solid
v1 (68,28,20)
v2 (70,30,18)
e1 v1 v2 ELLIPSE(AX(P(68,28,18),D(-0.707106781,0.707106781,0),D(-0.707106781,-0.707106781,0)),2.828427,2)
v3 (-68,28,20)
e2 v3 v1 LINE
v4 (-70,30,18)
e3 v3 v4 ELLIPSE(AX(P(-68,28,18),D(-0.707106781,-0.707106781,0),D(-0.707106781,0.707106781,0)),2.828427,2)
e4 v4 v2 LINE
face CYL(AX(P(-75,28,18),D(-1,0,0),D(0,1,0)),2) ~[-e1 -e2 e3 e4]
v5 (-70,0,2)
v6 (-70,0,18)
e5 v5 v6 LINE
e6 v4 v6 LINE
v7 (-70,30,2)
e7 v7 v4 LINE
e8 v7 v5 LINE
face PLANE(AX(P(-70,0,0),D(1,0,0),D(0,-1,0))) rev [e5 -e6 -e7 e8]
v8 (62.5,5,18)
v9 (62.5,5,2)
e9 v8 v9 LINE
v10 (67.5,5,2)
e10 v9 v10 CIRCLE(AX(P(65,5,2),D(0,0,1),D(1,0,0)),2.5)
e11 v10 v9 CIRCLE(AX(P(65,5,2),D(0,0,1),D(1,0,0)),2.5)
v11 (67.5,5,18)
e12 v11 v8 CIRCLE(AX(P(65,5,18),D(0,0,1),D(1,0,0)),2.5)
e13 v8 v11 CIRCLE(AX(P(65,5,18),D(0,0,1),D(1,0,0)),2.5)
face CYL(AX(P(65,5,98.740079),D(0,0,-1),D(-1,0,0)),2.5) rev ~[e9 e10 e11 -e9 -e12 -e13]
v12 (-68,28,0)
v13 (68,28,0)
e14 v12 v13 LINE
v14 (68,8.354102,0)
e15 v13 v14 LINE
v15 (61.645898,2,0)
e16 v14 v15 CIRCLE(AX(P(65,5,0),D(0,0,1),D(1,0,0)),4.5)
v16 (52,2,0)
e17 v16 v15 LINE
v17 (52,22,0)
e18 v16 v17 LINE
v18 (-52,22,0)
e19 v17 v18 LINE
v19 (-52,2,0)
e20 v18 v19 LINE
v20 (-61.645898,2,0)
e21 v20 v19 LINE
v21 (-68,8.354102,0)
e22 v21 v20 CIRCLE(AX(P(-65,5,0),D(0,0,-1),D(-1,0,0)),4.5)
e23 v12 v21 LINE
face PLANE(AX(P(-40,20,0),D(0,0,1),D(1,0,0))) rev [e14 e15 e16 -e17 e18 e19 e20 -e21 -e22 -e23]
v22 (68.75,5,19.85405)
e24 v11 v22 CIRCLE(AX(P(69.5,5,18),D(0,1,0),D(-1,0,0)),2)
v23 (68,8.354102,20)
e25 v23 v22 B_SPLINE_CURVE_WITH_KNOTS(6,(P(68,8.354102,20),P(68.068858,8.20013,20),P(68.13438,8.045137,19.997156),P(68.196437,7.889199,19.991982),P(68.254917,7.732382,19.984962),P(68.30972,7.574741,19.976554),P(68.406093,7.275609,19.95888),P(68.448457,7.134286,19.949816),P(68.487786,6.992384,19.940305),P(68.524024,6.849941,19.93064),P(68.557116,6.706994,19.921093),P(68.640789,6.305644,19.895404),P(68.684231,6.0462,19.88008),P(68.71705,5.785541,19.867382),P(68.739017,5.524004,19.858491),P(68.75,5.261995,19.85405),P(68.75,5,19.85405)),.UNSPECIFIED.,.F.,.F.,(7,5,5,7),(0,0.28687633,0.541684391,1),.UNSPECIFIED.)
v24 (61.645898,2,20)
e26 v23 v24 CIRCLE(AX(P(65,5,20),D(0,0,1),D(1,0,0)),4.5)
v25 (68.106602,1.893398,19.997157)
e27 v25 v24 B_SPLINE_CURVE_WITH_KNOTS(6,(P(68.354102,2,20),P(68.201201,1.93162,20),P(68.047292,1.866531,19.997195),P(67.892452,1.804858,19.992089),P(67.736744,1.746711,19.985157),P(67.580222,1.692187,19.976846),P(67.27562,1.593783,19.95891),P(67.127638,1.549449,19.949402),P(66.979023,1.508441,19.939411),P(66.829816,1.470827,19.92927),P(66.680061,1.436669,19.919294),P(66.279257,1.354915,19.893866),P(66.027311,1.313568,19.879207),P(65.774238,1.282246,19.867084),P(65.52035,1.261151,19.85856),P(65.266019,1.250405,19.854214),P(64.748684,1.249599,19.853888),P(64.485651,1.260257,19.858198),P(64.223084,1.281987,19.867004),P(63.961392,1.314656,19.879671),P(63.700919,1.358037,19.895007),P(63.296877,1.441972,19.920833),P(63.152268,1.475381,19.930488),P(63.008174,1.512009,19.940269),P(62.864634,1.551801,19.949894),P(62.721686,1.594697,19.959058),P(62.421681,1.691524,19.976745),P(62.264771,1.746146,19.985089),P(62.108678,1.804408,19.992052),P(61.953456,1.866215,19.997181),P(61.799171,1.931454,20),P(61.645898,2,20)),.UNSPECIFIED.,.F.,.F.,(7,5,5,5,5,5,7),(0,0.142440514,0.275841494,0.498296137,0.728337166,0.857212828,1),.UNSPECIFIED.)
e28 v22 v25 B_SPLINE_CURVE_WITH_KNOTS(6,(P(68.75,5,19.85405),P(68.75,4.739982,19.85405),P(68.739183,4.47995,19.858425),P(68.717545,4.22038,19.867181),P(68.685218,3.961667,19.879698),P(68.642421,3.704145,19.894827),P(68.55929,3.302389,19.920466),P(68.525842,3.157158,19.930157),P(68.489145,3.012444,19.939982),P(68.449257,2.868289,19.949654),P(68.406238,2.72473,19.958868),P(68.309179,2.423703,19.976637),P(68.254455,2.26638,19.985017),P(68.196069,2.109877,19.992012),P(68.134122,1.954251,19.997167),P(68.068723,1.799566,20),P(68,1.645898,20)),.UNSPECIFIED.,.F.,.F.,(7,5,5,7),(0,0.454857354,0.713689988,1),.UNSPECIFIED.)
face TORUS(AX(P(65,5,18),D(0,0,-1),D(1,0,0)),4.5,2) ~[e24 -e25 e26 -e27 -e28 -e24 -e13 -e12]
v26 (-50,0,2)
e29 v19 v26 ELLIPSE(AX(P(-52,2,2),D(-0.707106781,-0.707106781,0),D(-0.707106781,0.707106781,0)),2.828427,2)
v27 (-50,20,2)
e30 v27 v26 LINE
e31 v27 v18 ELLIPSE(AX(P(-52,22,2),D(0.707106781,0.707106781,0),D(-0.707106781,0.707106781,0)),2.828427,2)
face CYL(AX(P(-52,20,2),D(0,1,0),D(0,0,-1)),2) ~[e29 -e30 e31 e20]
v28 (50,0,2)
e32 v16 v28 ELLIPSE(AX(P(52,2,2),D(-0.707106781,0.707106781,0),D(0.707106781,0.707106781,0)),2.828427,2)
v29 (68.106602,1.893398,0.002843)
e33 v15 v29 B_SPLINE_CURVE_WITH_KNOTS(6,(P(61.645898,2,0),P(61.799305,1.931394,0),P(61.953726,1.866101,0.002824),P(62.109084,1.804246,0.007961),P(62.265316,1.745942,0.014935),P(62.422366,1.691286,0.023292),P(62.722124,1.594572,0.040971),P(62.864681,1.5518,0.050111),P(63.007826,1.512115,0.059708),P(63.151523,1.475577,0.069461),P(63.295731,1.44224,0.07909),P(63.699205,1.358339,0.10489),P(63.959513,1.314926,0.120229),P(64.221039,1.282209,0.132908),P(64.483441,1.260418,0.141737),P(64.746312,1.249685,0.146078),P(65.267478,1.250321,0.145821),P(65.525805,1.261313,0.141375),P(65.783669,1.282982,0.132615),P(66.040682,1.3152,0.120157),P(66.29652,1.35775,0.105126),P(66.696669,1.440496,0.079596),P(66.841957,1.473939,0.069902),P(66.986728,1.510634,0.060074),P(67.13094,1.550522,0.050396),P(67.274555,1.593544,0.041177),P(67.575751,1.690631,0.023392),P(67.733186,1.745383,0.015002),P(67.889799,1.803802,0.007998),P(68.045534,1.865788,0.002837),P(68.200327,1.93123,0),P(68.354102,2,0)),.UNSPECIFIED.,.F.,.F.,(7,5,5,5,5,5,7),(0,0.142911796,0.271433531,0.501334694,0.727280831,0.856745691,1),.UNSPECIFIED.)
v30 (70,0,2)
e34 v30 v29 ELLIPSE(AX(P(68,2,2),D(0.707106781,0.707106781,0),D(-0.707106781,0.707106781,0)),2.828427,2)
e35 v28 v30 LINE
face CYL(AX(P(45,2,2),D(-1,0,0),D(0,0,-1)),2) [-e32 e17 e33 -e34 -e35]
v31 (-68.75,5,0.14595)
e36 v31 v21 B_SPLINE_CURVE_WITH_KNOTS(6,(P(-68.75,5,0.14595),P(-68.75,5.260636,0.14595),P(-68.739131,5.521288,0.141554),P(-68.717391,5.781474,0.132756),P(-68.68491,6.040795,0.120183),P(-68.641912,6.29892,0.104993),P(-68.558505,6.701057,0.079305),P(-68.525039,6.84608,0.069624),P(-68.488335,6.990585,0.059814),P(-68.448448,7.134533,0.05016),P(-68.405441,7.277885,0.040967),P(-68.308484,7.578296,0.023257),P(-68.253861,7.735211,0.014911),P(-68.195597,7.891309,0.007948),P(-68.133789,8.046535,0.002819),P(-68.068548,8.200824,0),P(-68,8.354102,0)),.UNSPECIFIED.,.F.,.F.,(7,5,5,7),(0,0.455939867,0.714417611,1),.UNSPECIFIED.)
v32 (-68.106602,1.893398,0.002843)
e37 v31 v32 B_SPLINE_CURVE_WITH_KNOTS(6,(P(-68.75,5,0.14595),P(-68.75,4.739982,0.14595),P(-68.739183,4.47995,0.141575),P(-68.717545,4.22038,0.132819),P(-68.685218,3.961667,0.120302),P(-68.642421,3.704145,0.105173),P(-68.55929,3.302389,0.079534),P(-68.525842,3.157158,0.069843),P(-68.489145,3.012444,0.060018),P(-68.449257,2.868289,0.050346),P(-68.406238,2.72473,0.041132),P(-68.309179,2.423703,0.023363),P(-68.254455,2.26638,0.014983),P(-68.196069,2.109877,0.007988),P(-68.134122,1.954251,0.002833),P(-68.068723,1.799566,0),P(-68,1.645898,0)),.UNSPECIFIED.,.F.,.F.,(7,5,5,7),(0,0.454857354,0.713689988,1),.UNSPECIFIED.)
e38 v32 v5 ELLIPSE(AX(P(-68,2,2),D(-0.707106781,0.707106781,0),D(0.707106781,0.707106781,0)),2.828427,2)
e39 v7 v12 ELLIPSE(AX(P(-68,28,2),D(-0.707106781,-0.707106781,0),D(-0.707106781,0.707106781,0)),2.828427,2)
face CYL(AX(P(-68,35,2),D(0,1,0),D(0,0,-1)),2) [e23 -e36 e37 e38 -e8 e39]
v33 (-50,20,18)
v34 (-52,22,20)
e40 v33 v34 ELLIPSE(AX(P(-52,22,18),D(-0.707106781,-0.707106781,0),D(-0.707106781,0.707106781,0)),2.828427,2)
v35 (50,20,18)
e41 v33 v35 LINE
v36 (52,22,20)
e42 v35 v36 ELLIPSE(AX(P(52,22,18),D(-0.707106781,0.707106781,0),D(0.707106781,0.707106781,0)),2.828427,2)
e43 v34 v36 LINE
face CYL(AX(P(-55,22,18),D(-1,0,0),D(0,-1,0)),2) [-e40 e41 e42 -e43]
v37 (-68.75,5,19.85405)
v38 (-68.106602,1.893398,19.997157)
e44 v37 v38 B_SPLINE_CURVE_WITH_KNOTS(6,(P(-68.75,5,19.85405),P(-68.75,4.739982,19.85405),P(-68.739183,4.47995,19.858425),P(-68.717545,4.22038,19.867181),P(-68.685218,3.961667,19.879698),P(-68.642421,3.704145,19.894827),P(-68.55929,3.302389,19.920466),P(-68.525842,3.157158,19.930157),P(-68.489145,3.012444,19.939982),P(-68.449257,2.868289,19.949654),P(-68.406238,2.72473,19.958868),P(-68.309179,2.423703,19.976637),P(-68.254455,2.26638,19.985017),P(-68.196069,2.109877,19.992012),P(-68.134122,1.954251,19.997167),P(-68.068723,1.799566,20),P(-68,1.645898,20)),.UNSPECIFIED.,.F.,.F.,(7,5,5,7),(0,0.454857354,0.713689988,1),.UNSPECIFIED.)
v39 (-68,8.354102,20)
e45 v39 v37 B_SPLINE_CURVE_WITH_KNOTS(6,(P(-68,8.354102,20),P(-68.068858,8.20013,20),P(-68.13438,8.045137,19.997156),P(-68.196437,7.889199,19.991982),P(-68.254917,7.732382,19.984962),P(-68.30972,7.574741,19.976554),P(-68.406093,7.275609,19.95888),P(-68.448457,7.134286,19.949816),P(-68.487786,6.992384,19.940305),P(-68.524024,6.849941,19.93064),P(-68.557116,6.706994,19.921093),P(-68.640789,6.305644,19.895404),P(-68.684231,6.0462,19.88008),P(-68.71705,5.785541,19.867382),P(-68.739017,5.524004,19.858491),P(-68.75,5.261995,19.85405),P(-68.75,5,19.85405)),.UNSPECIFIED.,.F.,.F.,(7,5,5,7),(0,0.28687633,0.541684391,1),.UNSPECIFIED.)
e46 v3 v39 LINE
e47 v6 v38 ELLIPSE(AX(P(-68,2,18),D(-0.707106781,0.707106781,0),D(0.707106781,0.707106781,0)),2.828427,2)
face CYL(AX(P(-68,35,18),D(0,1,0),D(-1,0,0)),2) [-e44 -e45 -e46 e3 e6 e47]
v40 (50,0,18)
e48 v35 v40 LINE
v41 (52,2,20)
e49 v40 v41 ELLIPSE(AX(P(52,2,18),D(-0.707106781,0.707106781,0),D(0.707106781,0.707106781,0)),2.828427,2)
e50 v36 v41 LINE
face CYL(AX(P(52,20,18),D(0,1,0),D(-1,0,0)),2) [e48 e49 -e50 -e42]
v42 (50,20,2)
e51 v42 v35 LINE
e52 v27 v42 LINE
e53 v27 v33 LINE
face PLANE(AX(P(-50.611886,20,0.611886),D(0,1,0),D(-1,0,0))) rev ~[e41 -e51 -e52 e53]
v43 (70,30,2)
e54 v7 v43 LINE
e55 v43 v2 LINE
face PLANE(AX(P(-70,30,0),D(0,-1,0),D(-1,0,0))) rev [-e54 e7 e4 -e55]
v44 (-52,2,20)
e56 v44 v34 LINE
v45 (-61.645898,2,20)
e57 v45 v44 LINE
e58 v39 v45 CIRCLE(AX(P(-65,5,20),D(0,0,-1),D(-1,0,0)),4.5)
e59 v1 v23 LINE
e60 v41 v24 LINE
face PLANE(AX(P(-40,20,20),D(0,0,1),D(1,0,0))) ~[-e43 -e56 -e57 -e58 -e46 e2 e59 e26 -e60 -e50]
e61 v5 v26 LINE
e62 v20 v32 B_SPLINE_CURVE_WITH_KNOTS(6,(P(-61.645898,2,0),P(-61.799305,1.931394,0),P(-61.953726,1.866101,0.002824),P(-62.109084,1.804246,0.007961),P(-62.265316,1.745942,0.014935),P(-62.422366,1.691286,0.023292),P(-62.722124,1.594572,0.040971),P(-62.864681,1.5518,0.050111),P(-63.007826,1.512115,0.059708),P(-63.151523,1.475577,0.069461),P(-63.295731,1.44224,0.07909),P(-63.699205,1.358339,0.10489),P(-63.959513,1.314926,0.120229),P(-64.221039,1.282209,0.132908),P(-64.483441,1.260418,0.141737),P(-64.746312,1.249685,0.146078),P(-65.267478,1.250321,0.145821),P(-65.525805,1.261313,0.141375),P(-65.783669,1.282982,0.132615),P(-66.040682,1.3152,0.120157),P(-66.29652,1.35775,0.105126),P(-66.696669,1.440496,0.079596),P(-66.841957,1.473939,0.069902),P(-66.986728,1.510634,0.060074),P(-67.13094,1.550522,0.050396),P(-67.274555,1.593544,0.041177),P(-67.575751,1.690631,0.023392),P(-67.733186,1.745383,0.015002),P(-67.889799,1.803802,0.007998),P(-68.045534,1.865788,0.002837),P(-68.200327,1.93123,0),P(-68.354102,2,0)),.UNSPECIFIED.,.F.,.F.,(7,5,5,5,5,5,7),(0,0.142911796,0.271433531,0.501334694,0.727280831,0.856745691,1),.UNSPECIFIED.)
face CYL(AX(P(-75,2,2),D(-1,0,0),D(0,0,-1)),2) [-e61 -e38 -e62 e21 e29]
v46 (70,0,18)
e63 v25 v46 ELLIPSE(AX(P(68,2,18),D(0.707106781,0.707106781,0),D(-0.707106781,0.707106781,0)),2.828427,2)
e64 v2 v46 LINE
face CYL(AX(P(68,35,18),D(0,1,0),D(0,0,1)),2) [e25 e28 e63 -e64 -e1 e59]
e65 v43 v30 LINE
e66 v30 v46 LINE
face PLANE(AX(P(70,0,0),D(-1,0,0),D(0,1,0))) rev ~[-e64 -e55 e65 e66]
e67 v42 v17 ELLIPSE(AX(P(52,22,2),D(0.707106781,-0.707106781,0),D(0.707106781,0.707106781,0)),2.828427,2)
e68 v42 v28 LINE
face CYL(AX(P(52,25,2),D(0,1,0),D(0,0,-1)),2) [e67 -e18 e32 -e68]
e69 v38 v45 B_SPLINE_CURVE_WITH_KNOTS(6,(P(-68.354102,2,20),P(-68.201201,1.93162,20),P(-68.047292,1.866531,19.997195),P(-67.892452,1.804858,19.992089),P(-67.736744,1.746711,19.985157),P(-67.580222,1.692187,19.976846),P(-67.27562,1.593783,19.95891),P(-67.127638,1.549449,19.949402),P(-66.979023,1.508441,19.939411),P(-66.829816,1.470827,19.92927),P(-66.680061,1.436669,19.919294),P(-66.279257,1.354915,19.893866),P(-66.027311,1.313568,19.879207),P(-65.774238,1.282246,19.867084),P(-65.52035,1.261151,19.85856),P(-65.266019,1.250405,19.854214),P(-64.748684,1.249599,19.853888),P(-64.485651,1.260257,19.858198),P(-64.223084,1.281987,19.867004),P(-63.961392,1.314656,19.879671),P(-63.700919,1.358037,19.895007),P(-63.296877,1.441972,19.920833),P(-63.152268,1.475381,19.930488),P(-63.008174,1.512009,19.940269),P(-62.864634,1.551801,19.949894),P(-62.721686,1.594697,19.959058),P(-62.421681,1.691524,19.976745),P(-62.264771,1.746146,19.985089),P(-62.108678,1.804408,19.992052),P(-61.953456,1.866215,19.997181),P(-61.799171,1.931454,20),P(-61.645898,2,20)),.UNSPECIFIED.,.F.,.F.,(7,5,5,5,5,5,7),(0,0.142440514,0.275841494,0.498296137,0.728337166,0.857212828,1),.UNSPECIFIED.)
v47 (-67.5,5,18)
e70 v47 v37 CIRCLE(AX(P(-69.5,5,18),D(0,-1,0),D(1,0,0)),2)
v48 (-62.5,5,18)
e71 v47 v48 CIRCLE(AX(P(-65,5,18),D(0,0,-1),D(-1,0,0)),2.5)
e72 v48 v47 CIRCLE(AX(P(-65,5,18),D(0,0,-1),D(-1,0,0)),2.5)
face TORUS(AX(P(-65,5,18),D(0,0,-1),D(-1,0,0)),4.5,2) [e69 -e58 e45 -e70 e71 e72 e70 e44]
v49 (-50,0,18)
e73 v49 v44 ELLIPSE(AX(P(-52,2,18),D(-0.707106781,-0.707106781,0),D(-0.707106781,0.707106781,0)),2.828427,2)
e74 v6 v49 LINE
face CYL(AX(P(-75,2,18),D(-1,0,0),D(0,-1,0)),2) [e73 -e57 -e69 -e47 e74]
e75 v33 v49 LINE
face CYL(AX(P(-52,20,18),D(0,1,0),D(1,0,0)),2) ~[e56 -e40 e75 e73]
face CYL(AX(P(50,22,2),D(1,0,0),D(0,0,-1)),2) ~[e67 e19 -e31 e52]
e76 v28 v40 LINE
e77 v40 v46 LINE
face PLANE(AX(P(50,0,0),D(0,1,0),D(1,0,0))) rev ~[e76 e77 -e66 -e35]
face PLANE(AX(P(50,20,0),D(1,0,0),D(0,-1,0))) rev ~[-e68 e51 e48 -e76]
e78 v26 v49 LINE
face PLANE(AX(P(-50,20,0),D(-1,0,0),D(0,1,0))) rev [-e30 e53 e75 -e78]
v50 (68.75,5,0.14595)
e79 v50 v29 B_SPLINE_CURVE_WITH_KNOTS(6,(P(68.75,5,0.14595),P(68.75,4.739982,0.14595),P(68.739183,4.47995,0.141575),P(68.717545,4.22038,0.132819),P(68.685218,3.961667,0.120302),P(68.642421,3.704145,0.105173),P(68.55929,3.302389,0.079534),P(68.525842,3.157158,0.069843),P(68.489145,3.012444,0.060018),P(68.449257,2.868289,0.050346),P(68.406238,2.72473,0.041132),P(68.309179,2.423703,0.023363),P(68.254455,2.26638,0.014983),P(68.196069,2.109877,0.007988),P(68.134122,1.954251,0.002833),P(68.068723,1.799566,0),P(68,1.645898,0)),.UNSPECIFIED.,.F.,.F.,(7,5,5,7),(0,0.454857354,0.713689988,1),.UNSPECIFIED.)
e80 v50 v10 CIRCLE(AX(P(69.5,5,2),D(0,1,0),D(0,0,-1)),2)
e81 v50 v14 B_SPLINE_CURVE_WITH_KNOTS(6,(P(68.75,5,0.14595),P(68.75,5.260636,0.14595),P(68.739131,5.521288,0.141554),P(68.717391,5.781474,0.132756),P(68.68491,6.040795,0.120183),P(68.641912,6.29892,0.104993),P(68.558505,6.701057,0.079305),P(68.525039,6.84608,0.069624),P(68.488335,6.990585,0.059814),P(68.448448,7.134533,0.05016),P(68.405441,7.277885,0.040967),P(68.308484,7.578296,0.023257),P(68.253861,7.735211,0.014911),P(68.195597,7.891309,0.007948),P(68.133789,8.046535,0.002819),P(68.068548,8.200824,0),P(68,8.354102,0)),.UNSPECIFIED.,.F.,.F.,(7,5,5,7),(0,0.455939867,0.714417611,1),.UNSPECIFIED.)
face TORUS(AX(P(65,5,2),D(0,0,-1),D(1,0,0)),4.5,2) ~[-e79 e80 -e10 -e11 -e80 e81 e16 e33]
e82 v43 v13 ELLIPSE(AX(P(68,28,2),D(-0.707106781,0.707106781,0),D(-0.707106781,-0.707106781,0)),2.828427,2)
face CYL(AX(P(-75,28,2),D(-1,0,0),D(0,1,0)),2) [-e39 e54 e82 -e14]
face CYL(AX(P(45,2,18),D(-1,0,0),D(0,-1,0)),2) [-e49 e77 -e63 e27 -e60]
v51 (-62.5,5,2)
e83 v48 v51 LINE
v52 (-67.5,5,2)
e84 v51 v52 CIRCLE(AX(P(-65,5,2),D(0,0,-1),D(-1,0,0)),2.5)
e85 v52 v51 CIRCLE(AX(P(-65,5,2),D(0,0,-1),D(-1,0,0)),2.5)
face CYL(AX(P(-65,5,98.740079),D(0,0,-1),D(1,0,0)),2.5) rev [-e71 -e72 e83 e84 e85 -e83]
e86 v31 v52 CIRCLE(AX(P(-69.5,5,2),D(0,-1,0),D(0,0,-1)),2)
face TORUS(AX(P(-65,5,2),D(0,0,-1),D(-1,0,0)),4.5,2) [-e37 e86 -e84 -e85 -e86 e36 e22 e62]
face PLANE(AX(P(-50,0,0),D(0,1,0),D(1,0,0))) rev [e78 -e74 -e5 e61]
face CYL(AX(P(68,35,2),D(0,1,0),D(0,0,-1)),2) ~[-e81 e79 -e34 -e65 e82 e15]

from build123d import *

# Parameters (mm, degrees)
F1_DEPTH     = 20
F3_D         = 5
F5_T1_DEPTH  = 150
F5_T3_DEPTH  = 40
F5_T5_DEPTH  = 30
F5_T7_DEPTH  = 25
F5_T9_DEPTH  = 100
F5_T11_DEPTH = 30
F5_T25_DEPTH = 30
F5_T29_DEPTH = 105
F5_T36_DEPTH = 105
F5_T40_DEPTH = 30
F5_T47_DEPTH = 105
F5_T51_DEPTH = 30
F5_T58_DEPTH = 30
F5_T62_DEPTH = 105


# Not quite as in the source:
# - a fillet or chamfer that OpenCascade refuses, or shapes differently, is made with other operations: its cross-section is extruded or revolved along the edge and cut away or added


with BuildPart() as f1:
    # F0 (on Top) → F1 (new body)
    with BuildSketch(Plane.XY):
        Polygon((70, 30), (0, 30), (0, 20), (50, 20), (50, 0), (70, 0), align=None)
    extrude(amount=F1_DEPTH)

    # F3 (through all)
    with Locations(Plane.XY.offset(20)):
        with Locations((65, 5)):
            Hole(F3_D / 2)

    # F4: F1 across face


with BuildPart() as f1_1:
    add(f1.part)
    add(f1.part.mirror(Plane(origin=(0, 25, 10), x_dir=(0, -1, 0), z_dir=(-1, 0, 0))))

    # F5: fillet of radius 2 on 20 edges, made by hand

    # F5_s2 → F5_t1 (cut)
    with BuildSketch(Plane.YZ.offset(-75)):
        with BuildLine():
            ThreePointArc((30, 2), (29.4142135624, 0.5857864376), (28, 0))
            Line((28, 0), (30, 0))
            Line((30, 0), (30, 2))
        make_face()
        with BuildLine():
            ThreePointArc((30, 18), (29.4142135624, 19.4142135624), (28, 20))
            Line((28, 20), (30, 20))
            Line((30, 20), (30, 18))
        make_face()
    extrude(amount=F5_T1_DEPTH, mode=Mode.SUBTRACT)

    # F5_s4 → F5_t3 (cut)
    with BuildSketch(Plane.XZ.offset(-35)):
        with BuildLine():
            ThreePointArc((-68, 0), (-69.4142135624, 0.5857864376), (-70, 2))
            Line((-70, 2), (-70, 0))
            Line((-70, 0), (-68, 0))
        make_face()
        with BuildLine():
            ThreePointArc((68, 0), (69.4142135624, 0.5857864376), (70, 2))
            Line((70, 2), (70, 0))
            Line((70, 0), (68, 0))
        make_face()
        with BuildLine():
            ThreePointArc((-70, 18), (-69.4142135624, 19.4142135624), (-68, 20))
            Line((-68, 20), (-70, 20))
            Line((-70, 20), (-70, 18))
        make_face()
        with BuildLine():
            ThreePointArc((68, 20), (69.4142135624, 19.4142135624), (70, 18))
            Line((70, 18), (70, 20))
            Line((70, 20), (68, 20))
        make_face()
    extrude(amount=F5_T3_DEPTH, mode=Mode.SUBTRACT)

    # F5_s6 → F5_t5 (cut)
    with BuildSketch(Plane.YZ.offset(-75)):
        with BuildLine():
            ThreePointArc((2, 0), (0.5857864376, 0.5857864376), (0, 2))
            Line((0, 2), (0, 0))
            Line((0, 0), (2, 0))
        make_face()
        with BuildLine():
            ThreePointArc((0, 18), (0.5857864376, 19.4142135624), (2, 20))
            Line((2, 20), (0, 20))
            Line((0, 20), (0, 18))
        make_face()
    extrude(amount=F5_T5_DEPTH, mode=Mode.SUBTRACT)

    # F5_s8 → F5_t7 (cut)
    with BuildSketch(Plane.XZ.offset(-20)):
        with BuildLine():
            ThreePointArc((-52, 0), (-50.5857864376, 0.5857864376), (-50, 2))
            Line((-50, 2), (-50, 0))
            Line((-50, 0), (-52, 0))
        make_face()
        with BuildLine():
            ThreePointArc((52, 0), (50.5857864376, 0.5857864376), (50, 2))
            Line((50, 2), (50, 0))
            Line((50, 0), (52, 0))
        make_face()
        with BuildLine():
            ThreePointArc((-50, 18), (-50.5857864376, 19.4142135624), (-52, 20))
            Line((-52, 20), (-50, 20))
            Line((-50, 20), (-50, 18))
        make_face()
        with BuildLine():
            ThreePointArc((50, 18), (50.5857864376, 19.4142135624), (52, 20))
            Line((52, 20), (50, 20))
            Line((50, 20), (50, 18))
        make_face()
    extrude(amount=F5_T7_DEPTH, mode=Mode.SUBTRACT)

    # F5_s10 → F5_t9 (cut)
    with BuildSketch(Plane.YZ.offset(-50)):
        with BuildLine():
            ThreePointArc((22, 0), (20.5857864376, 0.5857864376), (20, 2))
            Line((20, 2), (20, 0))
            Line((20, 0), (22, 0))
        make_face()
        with BuildLine():
            ThreePointArc((20, 18), (20.5857864376, 19.4142135624), (22, 20))
            Line((22, 20), (20, 20))
            Line((20, 20), (20, 18))
        make_face()
    extrude(amount=F5_T9_DEPTH, mode=Mode.SUBTRACT)

    # F5_s12 → F5_t11 (cut)
    with BuildSketch(Plane.YZ.offset(45)):
        with BuildLine():
            ThreePointArc((2, 0), (0.5857864376, 0.5857864376), (0, 2))
            Line((0, 2), (0, 0))
            Line((0, 0), (2, 0))
        make_face()
        with BuildLine():
            ThreePointArc((0, 18), (0.5857864376, 19.4142135624), (2, 20))
            Line((2, 20), (0, 20))
            Line((0, 20), (0, 18))
        make_face()
    extrude(amount=F5_T11_DEPTH, mode=Mode.SUBTRACT)

    # F5_s13 → F5_t14 (revolve, cut)
    with BuildSketch(Plane.XZ.offset(-5)):
        with BuildLine():
            ThreePointArc((69.5, 0), (68.0857864376, 0.5857864376), (67.5, 2))
            Line((67.5, 2), (67.5, 0))
            Line((67.5, 0), (69.5, 0))
        make_face()
    revolve(axis=Axis((65, 5, 0), (0, 0, 1)), mode=Mode.SUBTRACT)

    # F5_s15 → F5_t16 (revolve, cut)
    with BuildSketch(Plane.XZ.offset(-5)):
        with BuildLine():
            ThreePointArc((-69.5, 0), (-68.0857864376, 0.5857864376), (-67.5, 2))
            Line((-67.5, 2), (-67.5, 0))
            Line((-67.5, 0), (-69.5, 0))
        make_face()
    revolve(axis=Axis((-65, 5, 0), (0, 0, -1)), mode=Mode.SUBTRACT)

    # F5_s17 → F5_t18 (revolve, cut)
    with BuildSketch(Plane.XZ.offset(-5)):
        with BuildLine():
            ThreePointArc((67.5, 18), (68.0857864376, 19.4142135624), (69.5, 20))
            Line((69.5, 20), (67.5, 20))
            Line((67.5, 20), (67.5, 18))
        make_face()
    revolve(axis=Axis((65, 5, 20), (0, 0, 1)), mode=Mode.SUBTRACT)

    # F5_s19 → F5_t20 (revolve, cut)
    with BuildSketch(Plane.XZ.offset(-5)):
        with BuildLine():
            ThreePointArc((-67.5, 18), (-68.0857864376, 19.4142135624), (-69.5, 20))
            Line((-69.5, 20), (-67.5, 20))
            Line((-67.5, 20), (-67.5, 18))
        make_face()
    revolve(axis=Axis((-65, 5, 20), (0, 0, -1)), mode=Mode.SUBTRACT)


with BuildPart() as f5_tool23:
    # F5_s24 → F5_t25 (new body)
    with BuildSketch(Plane.XZ.offset(-25)):
        with BuildLine():
            ThreePointArc((-52, 0), (-50.5857864376, 0.5857864376), (-50, 2))
            Line((-50, 2), (-50, 0))
            Line((-50, 0), (-52, 0))
        make_face()
    extrude(amount=F5_T25_DEPTH)

    split(bisect_by=Plane.XZ.offset(-20), keep=Keep.BOTTOM)


with BuildPart() as f5_tool27:
    # F5_s28 → F5_t29 (new body)
    with BuildSketch(Plane.YZ.offset(50)):
        with BuildLine():
            ThreePointArc((22, 0), (20.5857864376, 0.5857864376), (20, 2))
            Line((20, 2), (20, 0))
            Line((20, 0), (22, 0))
        make_face()
    extrude(amount=-F5_T29_DEPTH)

    split(bisect_by=Plane.YZ.offset(-50), keep=Keep.BOTTOM)


with BuildPart() as f5_tool23_1:
    add(f5_tool23.part)

    # F5_t31: intersect F5_tool27
    add(f5_tool27.part, mode=Mode.INTERSECT)


with BuildPart() as f1_2:
    add(f1_1.part)

    # F5_t21: cut F5_tool23
    add(f5_tool23_1.part, mode=Mode.SUBTRACT)


with BuildPart() as f5_tool34:
    # F5_s35 → F5_t36 (new body)
    with BuildSketch(Plane.YZ.offset(55)):
        with BuildLine():
            ThreePointArc((22, 0), (20.5857864376, 0.5857864376), (20, 2))
            Line((20, 2), (20, 0))
            Line((20, 0), (22, 0))
        make_face()
    extrude(amount=-F5_T36_DEPTH)

    split(bisect_by=Plane.YZ.offset(50), keep=Keep.TOP)


with BuildPart() as f5_tool38:
    # F5_s39 → F5_t40 (new body)
    with BuildSketch(Plane.XZ.offset(-25)):
        with BuildLine():
            ThreePointArc((52, 0), (50.5857864376, 0.5857864376), (50, 2))
            Line((50, 2), (50, 0))
            Line((50, 0), (52, 0))
        make_face()
    extrude(amount=F5_T40_DEPTH)

    split(bisect_by=Plane.XZ.offset(-20), keep=Keep.BOTTOM)


with BuildPart() as f5_tool34_1:
    add(f5_tool34.part)

    # F5_t42: intersect F5_tool38
    add(f5_tool38.part, mode=Mode.INTERSECT)


with BuildPart() as f1_3:
    add(f1_2.part)

    # F5_t32: cut F5_tool34
    add(f5_tool34_1.part, mode=Mode.SUBTRACT)


with BuildPart() as f5_tool45:
    # F5_s46 → F5_t47 (new body)
    with BuildSketch(Plane.YZ.offset(-55)):
        with BuildLine():
            ThreePointArc((20, 18), (20.5857864376, 19.4142135624), (22, 20))
            Line((22, 20), (20, 20))
            Line((20, 20), (20, 18))
        make_face()
    extrude(amount=F5_T47_DEPTH)

    split(bisect_by=Plane.YZ.offset(-50), keep=Keep.BOTTOM)


with BuildPart() as f5_tool49:
    # F5_s50 → F5_t51 (new body)
    with BuildSketch(Plane.XZ.offset(-25)):
        with BuildLine():
            ThreePointArc((-50, 18), (-50.5857864376, 19.4142135624), (-52, 20))
            Line((-52, 20), (-50, 20))
            Line((-50, 20), (-50, 18))
        make_face()
    extrude(amount=F5_T51_DEPTH)

    split(bisect_by=Plane.XZ.offset(-20), keep=Keep.BOTTOM)


with BuildPart() as f5_tool45_1:
    add(f5_tool45.part)

    # F5_t53: intersect F5_tool49
    add(f5_tool49.part, mode=Mode.INTERSECT)


with BuildPart() as f1_4:
    add(f1_3.part)

    # F5_t43: cut F5_tool45
    add(f5_tool45_1.part, mode=Mode.SUBTRACT)


with BuildPart() as f5_tool56:
    # F5_s57 → F5_t58 (new body)
    with BuildSketch(Plane.XZ.offset(-25)):
        with BuildLine():
            ThreePointArc((50, 18), (50.5857864376, 19.4142135624), (52, 20))
            Line((52, 20), (50, 20))
            Line((50, 20), (50, 18))
        make_face()
    extrude(amount=F5_T58_DEPTH)

    split(bisect_by=Plane.XZ.offset(-20), keep=Keep.BOTTOM)


with BuildPart() as f5_tool60:
    # F5_s61 → F5_t62 (new body)
    with BuildSketch(Plane.YZ.offset(-50)):
        with BuildLine():
            ThreePointArc((20, 18), (20.5857864376, 19.4142135624), (22, 20))
            Line((22, 20), (20, 20))
            Line((20, 20), (20, 18))
        make_face()
    extrude(amount=F5_T62_DEPTH)

    split(bisect_by=Plane.YZ.offset(50), keep=Keep.TOP)


with BuildPart() as f5_tool56_1:
    add(f5_tool56.part)

    # F5_t64: intersect F5_tool60
    add(f5_tool60.part, mode=Mode.INTERSECT)


with BuildPart() as f1_5:
    add(f1_4.part)

    # F5_t54: cut F5_tool56
    add(f5_tool56_1.part, mode=Mode.SUBTRACT)


solid = f1_5.part
